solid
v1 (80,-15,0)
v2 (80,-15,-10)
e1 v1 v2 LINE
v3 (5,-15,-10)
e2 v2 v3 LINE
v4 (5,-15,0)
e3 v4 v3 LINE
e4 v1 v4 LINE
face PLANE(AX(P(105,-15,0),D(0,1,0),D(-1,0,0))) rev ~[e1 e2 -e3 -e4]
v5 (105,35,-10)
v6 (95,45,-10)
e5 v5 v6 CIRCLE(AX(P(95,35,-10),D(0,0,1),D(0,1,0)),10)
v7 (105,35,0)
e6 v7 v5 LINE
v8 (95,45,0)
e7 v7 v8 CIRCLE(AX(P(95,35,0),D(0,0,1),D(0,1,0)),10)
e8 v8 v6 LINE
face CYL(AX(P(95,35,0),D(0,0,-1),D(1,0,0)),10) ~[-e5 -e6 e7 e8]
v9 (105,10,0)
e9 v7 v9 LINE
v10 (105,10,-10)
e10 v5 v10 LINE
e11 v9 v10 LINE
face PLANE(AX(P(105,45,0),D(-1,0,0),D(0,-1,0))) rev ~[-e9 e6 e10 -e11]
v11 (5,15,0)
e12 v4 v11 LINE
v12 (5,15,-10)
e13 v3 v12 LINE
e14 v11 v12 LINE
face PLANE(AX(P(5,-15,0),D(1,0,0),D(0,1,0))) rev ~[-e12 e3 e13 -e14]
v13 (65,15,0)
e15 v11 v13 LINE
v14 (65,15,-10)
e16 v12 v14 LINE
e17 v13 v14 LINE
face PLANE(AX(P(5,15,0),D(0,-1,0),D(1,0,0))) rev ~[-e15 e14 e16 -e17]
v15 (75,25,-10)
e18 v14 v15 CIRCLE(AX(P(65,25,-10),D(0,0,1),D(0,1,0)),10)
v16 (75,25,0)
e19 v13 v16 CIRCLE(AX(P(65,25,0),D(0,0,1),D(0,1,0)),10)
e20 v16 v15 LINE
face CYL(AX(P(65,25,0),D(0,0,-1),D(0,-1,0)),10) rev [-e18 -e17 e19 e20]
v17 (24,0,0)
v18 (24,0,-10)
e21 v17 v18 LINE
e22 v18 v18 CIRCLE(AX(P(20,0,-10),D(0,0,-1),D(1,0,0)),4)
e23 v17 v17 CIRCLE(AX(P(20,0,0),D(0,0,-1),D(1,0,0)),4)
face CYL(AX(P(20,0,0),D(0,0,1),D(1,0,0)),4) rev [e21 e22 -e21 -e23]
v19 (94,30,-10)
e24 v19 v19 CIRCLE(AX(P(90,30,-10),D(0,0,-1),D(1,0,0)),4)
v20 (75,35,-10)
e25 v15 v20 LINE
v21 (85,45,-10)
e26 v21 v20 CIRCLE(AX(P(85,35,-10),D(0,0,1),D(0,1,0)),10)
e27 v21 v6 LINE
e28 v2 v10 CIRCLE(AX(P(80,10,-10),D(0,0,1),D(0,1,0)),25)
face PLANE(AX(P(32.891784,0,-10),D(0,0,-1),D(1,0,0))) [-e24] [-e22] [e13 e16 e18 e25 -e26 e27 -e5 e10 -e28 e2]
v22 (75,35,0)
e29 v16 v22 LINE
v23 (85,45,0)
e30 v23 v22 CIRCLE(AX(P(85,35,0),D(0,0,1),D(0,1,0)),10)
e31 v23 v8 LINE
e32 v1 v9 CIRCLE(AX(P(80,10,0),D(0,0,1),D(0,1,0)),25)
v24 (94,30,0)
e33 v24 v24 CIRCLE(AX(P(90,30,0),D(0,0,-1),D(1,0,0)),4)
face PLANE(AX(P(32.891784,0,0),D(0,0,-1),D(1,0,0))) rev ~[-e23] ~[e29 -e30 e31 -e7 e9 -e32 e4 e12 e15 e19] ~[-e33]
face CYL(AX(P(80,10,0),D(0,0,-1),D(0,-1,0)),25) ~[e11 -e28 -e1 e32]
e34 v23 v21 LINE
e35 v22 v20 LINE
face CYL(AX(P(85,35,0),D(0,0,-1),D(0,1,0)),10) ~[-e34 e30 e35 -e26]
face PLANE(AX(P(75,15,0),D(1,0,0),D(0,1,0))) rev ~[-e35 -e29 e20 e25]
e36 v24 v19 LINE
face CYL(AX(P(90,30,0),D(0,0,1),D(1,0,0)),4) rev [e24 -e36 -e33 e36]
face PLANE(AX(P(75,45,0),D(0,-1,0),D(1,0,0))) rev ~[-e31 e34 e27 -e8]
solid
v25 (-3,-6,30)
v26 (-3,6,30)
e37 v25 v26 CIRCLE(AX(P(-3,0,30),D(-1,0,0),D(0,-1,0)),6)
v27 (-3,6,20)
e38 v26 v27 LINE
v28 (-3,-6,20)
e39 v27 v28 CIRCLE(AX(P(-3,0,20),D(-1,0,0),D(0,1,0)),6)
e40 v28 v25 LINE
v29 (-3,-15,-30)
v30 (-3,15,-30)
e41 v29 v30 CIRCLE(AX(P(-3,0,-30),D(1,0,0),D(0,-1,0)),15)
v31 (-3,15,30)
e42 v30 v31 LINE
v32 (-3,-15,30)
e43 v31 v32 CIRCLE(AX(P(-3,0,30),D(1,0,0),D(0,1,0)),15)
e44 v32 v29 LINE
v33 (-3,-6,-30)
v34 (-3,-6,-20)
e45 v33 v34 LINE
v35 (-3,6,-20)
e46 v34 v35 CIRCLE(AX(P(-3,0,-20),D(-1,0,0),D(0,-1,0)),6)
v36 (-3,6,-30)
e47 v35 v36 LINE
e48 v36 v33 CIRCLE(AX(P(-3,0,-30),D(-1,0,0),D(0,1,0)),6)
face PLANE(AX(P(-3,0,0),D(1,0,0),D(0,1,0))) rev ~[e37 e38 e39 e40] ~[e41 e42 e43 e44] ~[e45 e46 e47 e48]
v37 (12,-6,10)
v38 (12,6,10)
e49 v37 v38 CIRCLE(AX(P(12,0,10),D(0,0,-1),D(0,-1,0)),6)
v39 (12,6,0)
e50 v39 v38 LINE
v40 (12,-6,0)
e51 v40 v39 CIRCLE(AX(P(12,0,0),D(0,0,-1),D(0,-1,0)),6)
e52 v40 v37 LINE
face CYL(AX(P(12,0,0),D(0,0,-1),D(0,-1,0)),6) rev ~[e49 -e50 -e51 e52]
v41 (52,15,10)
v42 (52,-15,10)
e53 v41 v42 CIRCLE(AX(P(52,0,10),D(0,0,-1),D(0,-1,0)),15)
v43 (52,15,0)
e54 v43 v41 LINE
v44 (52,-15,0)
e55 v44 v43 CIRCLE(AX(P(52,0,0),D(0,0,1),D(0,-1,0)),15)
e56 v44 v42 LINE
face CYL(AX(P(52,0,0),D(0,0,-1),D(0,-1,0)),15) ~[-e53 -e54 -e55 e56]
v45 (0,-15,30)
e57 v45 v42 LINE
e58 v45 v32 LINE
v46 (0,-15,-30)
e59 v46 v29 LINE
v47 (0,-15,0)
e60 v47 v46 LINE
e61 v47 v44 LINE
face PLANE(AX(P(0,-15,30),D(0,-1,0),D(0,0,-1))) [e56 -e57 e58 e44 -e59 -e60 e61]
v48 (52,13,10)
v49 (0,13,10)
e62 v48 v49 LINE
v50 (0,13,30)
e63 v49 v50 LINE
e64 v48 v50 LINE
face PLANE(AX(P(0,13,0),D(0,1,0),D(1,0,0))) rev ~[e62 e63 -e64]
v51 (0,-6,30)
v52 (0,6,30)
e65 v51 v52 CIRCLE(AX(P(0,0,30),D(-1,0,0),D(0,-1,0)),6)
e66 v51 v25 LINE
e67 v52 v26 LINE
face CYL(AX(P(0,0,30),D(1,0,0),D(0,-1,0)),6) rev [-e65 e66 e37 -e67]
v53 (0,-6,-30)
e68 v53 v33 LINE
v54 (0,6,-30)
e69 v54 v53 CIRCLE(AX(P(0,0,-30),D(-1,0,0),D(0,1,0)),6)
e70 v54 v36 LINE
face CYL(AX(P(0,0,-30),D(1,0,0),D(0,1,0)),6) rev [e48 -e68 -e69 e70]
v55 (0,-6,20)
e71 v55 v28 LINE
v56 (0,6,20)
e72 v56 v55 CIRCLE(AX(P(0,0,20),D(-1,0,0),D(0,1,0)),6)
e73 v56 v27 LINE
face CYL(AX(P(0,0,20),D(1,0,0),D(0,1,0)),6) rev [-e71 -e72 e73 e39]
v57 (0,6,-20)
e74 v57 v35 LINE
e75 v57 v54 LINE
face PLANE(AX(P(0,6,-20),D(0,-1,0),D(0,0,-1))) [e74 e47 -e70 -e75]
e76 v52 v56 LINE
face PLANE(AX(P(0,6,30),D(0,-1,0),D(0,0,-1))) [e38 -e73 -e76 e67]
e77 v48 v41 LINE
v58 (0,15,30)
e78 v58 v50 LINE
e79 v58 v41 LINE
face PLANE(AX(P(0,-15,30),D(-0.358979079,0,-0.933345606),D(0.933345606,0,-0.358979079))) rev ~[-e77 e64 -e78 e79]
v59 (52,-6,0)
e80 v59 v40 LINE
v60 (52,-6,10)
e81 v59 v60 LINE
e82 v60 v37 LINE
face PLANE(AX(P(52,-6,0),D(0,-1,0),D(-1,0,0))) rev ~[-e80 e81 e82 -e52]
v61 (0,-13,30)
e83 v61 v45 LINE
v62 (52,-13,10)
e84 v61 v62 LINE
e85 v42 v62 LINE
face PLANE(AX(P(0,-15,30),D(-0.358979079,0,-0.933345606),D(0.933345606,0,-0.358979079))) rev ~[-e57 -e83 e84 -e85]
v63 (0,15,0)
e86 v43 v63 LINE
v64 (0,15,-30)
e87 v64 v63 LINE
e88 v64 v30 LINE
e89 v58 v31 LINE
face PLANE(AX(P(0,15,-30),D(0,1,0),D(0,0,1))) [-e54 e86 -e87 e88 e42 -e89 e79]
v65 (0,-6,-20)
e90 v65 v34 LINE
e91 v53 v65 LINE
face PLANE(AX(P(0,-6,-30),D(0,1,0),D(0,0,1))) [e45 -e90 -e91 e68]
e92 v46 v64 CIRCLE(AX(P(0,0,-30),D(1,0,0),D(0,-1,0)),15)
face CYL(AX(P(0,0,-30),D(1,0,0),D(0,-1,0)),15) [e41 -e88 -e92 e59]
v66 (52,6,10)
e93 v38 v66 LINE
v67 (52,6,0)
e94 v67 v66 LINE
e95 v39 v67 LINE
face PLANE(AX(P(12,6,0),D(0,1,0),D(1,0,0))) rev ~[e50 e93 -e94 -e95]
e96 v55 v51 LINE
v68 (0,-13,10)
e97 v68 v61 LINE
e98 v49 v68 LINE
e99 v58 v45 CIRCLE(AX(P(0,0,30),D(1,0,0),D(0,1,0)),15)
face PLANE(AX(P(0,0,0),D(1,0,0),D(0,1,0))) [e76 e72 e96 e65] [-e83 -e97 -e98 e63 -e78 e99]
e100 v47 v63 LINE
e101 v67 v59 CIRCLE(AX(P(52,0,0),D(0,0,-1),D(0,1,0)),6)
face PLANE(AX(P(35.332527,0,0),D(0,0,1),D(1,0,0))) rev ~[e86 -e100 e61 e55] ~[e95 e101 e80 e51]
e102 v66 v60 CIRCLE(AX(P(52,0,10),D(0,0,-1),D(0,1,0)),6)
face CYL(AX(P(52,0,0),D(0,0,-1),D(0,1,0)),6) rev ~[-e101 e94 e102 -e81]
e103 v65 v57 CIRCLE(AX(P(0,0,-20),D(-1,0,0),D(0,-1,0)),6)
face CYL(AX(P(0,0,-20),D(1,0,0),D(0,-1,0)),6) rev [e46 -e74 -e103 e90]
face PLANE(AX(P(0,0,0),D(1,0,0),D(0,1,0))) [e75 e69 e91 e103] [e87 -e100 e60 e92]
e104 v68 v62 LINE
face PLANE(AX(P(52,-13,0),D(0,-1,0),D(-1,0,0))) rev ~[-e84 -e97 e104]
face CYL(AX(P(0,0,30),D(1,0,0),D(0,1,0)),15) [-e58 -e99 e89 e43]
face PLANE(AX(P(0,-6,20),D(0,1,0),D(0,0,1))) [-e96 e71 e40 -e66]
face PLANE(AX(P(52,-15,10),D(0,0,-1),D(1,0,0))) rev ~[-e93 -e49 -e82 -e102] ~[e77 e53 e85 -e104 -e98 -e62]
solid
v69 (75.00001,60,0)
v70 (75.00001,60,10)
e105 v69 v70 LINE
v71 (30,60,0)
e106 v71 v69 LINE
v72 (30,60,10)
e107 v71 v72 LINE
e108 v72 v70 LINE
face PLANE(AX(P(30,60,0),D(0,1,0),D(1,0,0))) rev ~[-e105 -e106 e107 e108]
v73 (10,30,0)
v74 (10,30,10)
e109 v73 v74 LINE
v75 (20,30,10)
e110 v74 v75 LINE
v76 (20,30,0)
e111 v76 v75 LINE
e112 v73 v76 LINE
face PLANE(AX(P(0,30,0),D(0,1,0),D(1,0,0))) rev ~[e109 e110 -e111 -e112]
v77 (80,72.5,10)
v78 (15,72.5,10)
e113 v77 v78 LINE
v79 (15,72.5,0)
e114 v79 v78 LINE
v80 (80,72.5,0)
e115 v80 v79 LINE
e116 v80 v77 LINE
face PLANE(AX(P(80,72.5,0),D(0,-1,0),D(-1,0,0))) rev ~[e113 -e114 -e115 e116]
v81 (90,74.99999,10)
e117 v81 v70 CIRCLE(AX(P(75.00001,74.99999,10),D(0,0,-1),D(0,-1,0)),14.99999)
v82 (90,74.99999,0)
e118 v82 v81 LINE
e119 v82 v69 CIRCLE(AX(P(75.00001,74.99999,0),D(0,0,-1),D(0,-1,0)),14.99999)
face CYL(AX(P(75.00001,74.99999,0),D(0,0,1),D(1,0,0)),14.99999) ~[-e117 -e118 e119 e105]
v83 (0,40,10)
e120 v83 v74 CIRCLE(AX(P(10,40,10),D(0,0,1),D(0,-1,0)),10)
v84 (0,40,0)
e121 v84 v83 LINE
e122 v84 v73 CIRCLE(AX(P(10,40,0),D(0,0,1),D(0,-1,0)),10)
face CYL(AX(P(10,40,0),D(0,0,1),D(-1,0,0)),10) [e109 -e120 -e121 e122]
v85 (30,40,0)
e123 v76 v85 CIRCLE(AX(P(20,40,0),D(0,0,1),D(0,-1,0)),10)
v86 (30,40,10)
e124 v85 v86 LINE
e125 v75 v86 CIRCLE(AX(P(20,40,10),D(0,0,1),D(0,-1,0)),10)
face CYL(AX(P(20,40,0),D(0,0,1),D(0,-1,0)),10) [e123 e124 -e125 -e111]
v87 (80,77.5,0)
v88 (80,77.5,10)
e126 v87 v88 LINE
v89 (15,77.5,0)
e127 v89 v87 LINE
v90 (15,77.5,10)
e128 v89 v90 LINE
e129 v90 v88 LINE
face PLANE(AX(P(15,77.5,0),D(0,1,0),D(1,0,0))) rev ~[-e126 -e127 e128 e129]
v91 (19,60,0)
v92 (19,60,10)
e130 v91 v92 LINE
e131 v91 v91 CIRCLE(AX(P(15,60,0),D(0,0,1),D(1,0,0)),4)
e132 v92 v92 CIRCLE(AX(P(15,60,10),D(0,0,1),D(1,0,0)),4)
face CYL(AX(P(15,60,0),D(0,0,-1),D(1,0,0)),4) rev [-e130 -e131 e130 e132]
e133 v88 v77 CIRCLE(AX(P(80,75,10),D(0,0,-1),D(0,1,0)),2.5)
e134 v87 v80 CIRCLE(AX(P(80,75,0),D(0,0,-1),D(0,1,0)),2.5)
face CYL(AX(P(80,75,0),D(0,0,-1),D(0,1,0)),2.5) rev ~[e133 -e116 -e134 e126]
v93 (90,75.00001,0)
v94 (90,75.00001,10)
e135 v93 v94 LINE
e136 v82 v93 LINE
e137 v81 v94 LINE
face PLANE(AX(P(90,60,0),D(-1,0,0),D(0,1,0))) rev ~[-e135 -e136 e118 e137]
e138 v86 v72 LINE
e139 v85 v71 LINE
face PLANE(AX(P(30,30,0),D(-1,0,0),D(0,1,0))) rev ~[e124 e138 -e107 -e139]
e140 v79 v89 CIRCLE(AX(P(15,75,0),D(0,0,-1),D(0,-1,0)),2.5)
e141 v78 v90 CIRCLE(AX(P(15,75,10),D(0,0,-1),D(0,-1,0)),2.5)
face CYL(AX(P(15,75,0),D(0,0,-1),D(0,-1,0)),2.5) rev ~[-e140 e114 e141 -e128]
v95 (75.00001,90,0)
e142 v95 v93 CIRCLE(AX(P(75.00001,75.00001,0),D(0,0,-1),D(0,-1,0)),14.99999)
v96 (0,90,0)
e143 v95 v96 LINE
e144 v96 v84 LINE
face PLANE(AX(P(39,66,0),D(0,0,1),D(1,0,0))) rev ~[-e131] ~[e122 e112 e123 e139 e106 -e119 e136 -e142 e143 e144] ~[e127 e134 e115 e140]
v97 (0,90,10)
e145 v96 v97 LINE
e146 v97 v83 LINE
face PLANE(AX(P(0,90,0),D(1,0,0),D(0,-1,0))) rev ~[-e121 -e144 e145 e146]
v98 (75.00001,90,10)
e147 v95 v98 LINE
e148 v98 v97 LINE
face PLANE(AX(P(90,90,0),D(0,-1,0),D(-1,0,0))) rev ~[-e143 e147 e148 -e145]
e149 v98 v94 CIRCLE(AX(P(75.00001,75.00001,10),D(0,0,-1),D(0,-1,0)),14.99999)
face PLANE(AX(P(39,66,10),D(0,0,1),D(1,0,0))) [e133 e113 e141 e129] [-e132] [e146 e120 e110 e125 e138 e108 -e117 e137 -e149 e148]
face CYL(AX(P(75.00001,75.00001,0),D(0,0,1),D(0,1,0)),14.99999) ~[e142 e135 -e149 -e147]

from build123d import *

# Parameters (mm, degrees)
F1_DEPTH  = 10
F3_DEPTH  = 3
F4_R      = 4
F5_DEPTH  = 10
F6_R      = 25
F7_R      = 10
F8_DEPTH  = 30
F9_W      = 23.3748118877
F9_H      = 20
F10_DEPTH = 30
F13_R     = 4
F14_DEPTH = 10
F15_R     = 14.99999
F16_R     = 10


# Not quite as in the source:
# - a fillet or chamfer is up to 0.001 mm smaller than in the source, because OpenCascade refuses the exact size


with BuildPart() as f1:
    # F0 (on Top) → F1 (new body)
    with BuildSketch(Plane.XY):
        with BuildLine():
            Line((52, 15), (0, 15))
            Line((0, 15), (0, 13))
            Line((0, 13), (52, 13))
            ThreePointArc((52, 13), (65, 0), (52, -13))
            Line((52, -13), (0, -13))
            Line((0, -13), (0, -15))
            Line((0, -15), (52, -15))
            ThreePointArc((52, -15), (67, 0), (52, 15))
        make_face()
        with BuildLine():
            Line((52, 13), (0, 13))
            Line((0, 13), (0, -13))
            Line((0, -13), (52, -13))
            ThreePointArc((52, -13), (65, 0), (52, 13))
        make_face()
        with BuildLine():
            Line((12, 6), (52, 6))
            ThreePointArc((52, 6), (58, 0), (52, -6))
            Line((52, -6), (12, -6))
            ThreePointArc((12, -6), (6, 0), (12, 6))
        make_face(mode=Mode.SUBTRACT)
    extrude(amount=F1_DEPTH)

    # F2 (on Right) → F3 (join)
    with BuildSketch(Plane.YZ):
        with BuildLine():
            Line((-15, 30), (-15, 0))
            Line((-15, 0), (-15, -30))
            ThreePointArc((-15, -30), (0, -45), (15, -30))
            Line((15, -30), (15, 0))
            Line((15, 0), (15, 30))
            ThreePointArc((15, 30), (0, 45), (-15, 30))
        make_face()
        with BuildLine():
            Line((6, -20), (6, -30))
            ThreePointArc((6, -30), (0, -36), (-6, -30))
            Line((-6, -30), (-6, -20))
            ThreePointArc((-6, -20), (0, -14), (6, -20))
        make_face(mode=Mode.SUBTRACT)
        with BuildLine():
            Line((-6, 20), (-6, 30))
            ThreePointArc((-6, 30), (0, 36), (6, 30))
            Line((6, 30), (6, 20))
            ThreePointArc((6, 20), (0, 14), (-6, 20))
        make_face(mode=Mode.SUBTRACT)
    extrude(amount=-F3_DEPTH)

    # F0 (on Top) → F8 (join)
    with BuildSketch(Plane.XY):
        with BuildLine():
            Line((52, 15), (0, 15))
            Line((0, 15), (0, 13))
            Line((0, 13), (52, 13))
            ThreePointArc((52, 13), (65, 0), (52, -13))
            Line((52, -13), (0, -13))
            Line((0, -13), (0, -15))
            Line((0, -15), (52, -15))
            ThreePointArc((52, -15), (67, 0), (52, 15))
        make_face()
    extrude(amount=F8_DEPTH)

    # F9 (on face) → F10 (cut)
    with BuildSketch(Plane.XZ.offset(15)):
        with Locations((63.6874059439, 20)):
            Rectangle(F9_W, F9_H)
        Polygon((52, 30), (0, 30), (52, 10), align=None)
    extrude(amount=-F10_DEPTH, mode=Mode.SUBTRACT)


with BuildPart() as f5:
    # F4 (on face) → F5 (new body)
    with BuildSketch(Plane(origin=(0, 0, 0), x_dir=(1, 0, 0), z_dir=(0, 0, -1))):
        with BuildLine():
            Line((52, 15), (5, 15))
            Line((5, 15), (5, -15))
            Line((5, -15), (52, -15))
            ThreePointArc((52, -15), (67, 0), (52, 15))
        make_face()
        with BuildLine():
            Line((52, -6), (12, -6))
            ThreePointArc((12, -6), (6, 0), (12, 6))
            Line((12, 6), (52, 6))
            ThreePointArc((52, 6), (58, 0), (52, -6))
        make_face(mode=Mode.SUBTRACT)
        with BuildLine():
            Line((105, 15), (52, 15))
            ThreePointArc((52, 15), (67, 0), (52, -15))
            Line((52, -15), (75, -15))
            Line((75, -15), (75, -45))
            Line((75, -45), (105, -45))
            Line((105, -45), (105, 15))
        make_face()
        with Locations((90, -30)):
            Circle(F4_R, mode=Mode.SUBTRACT)
        with BuildLine():
            ThreePointArc((12, 6), (6, 0), (12, -6))
            Line((12, -6), (52, -6))
            ThreePointArc((52, -6), (58, 0), (52, 6))
            Line((52, 6), (12, 6))
        make_face()
        with Locations((20, 0)):
            Circle(F4_R, mode=Mode.SUBTRACT)
    extrude(amount=F5_DEPTH)

    # F6
    f6_edges = [f5.edges().sort_by_distance(p)[0] for p in [
        (105, -15, -5),
    ]]
    fillet(f6_edges, radius=F6_R)

    # F7
    f7_edges = [f5.edges().sort_by_distance(p)[0] for p in [
        (75, 45, -5),
        (105, 45, -5),
        (75, 15, -5),
    ]]
    fillet(f7_edges, radius=F7_R)


with BuildPart() as f14:
    # F13 (on Top) → F14 (new body)
    with BuildSketch(Plane.XY):
        Polygon((90, 90), (0, 90), (0, 30), (30, 30), (30, 60), (90, 60), align=None)
        with Locations((15, 60)):
            Circle(F13_R, mode=Mode.SUBTRACT)
        with BuildLine():
            Line((15, 77.5), (80, 77.5))
            ThreePointArc((80, 77.5), (82.5, 75), (80, 72.5))
            Line((80, 72.5), (15, 72.5))
            ThreePointArc((15, 72.5), (12.5, 75), (15, 77.5))
        make_face(mode=Mode.SUBTRACT)
    extrude(amount=F14_DEPTH)

    # F15 (radius 15 in the source; OpenCascade refuses exactly that, so slightly less here)
    f15_edges = [f14.edges().sort_by_distance(p)[0] for p in [
        (90, 60, 5),
        (90, 90, 5),
    ]]
    fillet(f15_edges, radius=F15_R)

    # F16
    f16_edges = [f14.edges().sort_by_distance(p)[0] for p in [
        (0, 30, 5),
        (30, 30, 5),
    ]]
    fillet(f16_edges, radius=F16_R)


solid = Compound([f1.part, f5.part, f14.part])
